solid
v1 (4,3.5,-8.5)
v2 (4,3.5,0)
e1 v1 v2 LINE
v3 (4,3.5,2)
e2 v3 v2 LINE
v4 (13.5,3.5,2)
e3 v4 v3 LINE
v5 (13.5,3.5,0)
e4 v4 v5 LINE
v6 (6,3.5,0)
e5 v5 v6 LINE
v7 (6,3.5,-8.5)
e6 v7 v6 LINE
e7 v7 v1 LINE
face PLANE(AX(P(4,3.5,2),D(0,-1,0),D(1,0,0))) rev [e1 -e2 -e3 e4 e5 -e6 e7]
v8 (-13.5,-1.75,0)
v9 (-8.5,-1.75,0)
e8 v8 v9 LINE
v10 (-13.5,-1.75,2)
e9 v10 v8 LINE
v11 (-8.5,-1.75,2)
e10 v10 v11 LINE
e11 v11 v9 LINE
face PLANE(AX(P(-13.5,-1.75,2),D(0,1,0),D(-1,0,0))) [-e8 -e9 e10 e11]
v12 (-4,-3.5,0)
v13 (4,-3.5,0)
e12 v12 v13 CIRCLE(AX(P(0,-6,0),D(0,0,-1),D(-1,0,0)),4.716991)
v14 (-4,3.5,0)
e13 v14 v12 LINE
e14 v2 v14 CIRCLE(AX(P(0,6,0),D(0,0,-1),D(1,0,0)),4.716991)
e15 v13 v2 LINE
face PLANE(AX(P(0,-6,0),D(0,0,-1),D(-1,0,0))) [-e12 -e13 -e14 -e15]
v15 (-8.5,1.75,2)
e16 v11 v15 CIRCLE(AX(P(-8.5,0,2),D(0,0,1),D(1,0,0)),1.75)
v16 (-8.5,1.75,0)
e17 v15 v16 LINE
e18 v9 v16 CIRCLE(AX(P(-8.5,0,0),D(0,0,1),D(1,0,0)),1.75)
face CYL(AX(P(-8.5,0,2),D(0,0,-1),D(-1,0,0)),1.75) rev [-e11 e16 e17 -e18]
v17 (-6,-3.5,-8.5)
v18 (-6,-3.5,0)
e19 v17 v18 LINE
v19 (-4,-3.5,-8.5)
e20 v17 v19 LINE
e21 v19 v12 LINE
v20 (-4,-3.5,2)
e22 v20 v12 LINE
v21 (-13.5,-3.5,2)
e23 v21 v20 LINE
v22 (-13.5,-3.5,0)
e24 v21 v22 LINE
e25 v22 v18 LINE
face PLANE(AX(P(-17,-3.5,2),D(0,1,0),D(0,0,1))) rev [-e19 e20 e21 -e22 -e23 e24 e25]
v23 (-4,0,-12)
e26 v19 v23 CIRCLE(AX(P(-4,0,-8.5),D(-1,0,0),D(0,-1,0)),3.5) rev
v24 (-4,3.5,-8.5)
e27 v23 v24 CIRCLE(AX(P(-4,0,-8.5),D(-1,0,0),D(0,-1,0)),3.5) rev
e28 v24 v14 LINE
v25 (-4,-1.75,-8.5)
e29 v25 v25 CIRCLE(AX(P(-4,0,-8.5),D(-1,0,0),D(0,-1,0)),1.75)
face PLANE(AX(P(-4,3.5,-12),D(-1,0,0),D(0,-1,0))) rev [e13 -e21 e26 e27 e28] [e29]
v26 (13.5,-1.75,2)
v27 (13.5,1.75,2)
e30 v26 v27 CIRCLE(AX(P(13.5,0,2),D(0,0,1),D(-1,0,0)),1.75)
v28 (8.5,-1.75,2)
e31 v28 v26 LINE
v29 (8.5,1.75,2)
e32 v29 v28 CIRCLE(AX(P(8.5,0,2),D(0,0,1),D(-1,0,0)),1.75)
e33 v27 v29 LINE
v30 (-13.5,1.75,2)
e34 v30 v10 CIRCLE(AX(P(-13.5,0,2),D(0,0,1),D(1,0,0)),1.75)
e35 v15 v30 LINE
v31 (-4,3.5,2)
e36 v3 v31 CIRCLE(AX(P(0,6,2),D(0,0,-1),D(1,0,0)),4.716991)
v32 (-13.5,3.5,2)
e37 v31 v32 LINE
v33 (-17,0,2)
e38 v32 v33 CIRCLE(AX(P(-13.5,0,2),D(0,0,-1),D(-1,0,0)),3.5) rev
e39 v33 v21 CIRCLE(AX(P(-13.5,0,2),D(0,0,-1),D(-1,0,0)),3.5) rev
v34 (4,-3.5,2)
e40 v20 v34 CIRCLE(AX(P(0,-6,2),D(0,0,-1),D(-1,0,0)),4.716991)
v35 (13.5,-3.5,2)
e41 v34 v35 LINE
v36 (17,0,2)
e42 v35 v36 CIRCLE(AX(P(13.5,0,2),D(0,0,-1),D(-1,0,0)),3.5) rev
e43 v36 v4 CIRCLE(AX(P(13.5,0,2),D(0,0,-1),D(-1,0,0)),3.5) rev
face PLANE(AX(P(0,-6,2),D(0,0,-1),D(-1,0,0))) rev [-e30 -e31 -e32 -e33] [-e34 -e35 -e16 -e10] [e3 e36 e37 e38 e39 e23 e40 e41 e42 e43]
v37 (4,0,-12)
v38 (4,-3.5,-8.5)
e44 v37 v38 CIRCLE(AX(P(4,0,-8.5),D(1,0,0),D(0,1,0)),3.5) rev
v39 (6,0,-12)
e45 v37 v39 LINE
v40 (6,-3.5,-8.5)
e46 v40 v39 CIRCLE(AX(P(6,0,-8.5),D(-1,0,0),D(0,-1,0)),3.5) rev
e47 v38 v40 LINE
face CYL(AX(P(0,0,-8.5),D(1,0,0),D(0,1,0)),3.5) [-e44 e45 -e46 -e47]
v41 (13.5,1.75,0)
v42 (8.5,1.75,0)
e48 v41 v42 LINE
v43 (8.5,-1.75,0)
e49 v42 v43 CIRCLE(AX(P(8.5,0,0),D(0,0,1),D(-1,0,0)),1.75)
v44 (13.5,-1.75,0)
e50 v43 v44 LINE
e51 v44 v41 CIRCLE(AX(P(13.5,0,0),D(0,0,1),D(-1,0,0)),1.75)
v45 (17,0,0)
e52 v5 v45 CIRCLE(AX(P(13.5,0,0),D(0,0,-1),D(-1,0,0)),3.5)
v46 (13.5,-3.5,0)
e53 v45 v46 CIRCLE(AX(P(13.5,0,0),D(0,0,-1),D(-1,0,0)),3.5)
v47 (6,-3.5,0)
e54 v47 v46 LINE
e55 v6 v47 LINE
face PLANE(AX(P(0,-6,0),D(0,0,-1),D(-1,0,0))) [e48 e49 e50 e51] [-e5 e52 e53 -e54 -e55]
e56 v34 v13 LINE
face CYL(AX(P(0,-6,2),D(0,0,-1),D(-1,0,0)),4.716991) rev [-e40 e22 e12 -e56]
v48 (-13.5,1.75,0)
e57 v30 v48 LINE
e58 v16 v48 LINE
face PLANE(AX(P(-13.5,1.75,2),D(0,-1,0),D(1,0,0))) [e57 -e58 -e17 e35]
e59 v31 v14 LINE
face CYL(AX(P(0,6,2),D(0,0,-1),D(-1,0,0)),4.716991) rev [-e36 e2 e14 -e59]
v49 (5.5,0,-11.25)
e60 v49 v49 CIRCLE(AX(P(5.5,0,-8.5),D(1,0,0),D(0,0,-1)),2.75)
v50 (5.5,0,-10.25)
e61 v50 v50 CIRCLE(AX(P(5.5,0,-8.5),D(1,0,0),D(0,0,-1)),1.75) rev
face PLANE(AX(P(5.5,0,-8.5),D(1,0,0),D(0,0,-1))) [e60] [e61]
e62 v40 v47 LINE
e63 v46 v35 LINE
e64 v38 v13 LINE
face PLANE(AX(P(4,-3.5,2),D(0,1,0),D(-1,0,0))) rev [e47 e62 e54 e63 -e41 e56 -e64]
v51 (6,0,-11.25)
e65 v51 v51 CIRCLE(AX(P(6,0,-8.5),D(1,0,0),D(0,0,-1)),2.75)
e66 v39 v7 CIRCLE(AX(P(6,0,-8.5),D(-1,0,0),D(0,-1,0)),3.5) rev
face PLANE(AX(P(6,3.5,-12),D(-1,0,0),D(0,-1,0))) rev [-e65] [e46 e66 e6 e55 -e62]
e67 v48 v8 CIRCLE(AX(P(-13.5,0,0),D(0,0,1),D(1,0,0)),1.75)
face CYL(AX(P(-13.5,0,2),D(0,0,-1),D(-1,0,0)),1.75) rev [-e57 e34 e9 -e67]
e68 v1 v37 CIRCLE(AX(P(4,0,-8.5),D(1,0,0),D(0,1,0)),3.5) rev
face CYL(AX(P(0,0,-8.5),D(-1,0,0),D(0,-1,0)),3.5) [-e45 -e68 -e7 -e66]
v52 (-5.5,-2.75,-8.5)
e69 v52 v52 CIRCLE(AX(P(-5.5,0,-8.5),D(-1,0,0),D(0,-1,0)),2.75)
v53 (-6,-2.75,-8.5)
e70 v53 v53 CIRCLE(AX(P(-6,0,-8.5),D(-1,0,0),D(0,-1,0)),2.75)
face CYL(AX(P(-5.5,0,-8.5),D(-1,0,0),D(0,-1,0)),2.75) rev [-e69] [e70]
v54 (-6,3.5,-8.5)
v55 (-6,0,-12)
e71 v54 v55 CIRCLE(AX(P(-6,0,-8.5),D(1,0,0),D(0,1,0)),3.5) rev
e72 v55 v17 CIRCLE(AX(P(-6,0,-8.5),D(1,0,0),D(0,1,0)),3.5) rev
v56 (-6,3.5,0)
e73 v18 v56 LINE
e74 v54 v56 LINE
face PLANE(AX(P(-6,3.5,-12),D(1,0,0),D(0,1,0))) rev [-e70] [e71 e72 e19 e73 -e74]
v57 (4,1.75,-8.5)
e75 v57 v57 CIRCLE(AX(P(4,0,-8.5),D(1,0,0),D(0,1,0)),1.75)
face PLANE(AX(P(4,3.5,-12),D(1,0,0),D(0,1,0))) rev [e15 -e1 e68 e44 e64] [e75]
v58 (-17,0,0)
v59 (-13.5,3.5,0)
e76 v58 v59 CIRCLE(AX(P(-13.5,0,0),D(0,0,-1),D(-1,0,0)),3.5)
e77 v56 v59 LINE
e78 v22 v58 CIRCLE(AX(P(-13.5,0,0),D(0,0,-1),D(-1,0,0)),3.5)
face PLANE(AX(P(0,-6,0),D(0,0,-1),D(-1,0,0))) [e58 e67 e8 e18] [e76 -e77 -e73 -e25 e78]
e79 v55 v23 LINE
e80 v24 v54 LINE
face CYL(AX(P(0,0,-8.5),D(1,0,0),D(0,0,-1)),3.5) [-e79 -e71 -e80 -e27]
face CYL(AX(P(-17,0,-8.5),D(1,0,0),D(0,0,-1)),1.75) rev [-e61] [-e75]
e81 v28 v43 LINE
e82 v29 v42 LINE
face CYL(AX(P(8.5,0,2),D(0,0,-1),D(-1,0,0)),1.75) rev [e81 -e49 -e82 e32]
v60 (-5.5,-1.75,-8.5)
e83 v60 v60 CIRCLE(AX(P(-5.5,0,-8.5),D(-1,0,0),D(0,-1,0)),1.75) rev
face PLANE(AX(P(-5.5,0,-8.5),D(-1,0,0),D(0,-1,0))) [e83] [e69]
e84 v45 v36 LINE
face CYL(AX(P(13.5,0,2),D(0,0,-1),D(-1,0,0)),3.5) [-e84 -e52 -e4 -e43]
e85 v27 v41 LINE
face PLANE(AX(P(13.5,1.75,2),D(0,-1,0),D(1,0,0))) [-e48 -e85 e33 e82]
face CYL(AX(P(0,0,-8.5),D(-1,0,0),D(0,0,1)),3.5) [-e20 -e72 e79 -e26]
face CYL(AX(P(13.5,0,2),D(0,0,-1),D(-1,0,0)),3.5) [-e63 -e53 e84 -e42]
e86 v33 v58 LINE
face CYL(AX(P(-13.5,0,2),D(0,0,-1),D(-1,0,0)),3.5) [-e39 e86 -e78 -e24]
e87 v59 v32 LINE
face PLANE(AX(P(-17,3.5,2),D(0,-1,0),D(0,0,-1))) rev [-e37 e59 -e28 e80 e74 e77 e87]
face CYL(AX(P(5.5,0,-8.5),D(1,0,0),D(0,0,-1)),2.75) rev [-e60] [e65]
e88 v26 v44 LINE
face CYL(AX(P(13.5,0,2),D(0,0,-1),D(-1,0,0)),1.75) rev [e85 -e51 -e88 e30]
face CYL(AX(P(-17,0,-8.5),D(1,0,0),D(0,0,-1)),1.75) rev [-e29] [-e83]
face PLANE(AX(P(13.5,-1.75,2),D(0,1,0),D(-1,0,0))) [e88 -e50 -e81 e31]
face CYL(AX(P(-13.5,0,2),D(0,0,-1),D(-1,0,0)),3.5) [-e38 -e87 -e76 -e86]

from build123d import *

# Parameters (mm, degrees)
EXTRUDE_2_DEPTH     = 2
SKETCH_4_W          = 2
SKETCH_4_H          = 7
EXTRUDE_3_DEPTH     = 12
FILLET_1_R          = 3.5
SKETCH_5_R          = 1.75
CUT_EXTRUDE_1_DEPTH = 27.177280225
FILLET_2_R          = 3.5
SKETCH_6_R          = 2.75
CUT_EXTRUDE_2_DEPTH = 0.5
CUT_EXTRUDE_START   = -0.5
SKETCH_7_R          = 2.75
CUT_EXTRUDE_3_DEPTH = 0.5


with BuildPart() as part:
    # 草图3 → 凸台-拉伸2 (new body)
    with BuildSketch(Plane.XY):
        with BuildLine():
            Line((-17, -3.5), (-4, -3.5))
            ThreePointArc((-4, -3.5), (0, -1.283009434), (4, -3.5))
            Line((4, -3.5), (17, -3.5))
            Line((17, -3.5), (17, 3.5))
            Line((17, 3.5), (4, 3.5))
            ThreePointArc((4, 3.5), (0, 1.283009434), (-4, 3.5))
            Line((-4, 3.5), (-17, 3.5))
            Line((-17, 3.5), (-17, -3.5))
        make_face()
        with BuildLine():
            Line((-13.5, 1.75), (-8.5, 1.75))
            ThreePointArc((-8.5, 1.75), (-6.75, 0), (-8.5, -1.75))
            Line((-8.5, -1.75), (-13.5, -1.75))
            ThreePointArc((-13.5, -1.75), (-15.25, 0), (-13.5, 1.75))
        make_face(mode=Mode.SUBTRACT)
        with BuildLine():
            Line((13.5, 1.75), (8.5, 1.75))
            ThreePointArc((8.5, 1.75), (6.75, 0), (8.5, -1.75))
            Line((8.5, -1.75), (13.5, -1.75))
            ThreePointArc((13.5, -1.75), (15.25, 0), (13.5, 1.75))
        make_face(mode=Mode.SUBTRACT)
    extrude(amount=EXTRUDE_2_DEPTH)

    # 草图4 → 凸台-拉伸3 (add)
    with BuildSketch(Plane(origin=(0, 0, 0), x_dir=(-1, 0, 0), z_dir=(0, 0, -1))):
        with Locations((-5, 0)):
            Rectangle(SKETCH_4_W, SKETCH_4_H)
        with Locations((5, 0)):
            Rectangle(SKETCH_4_W, SKETCH_4_H)
    extrude(amount=EXTRUDE_3_DEPTH)

    # 圆角1
    fillet_1_edges = [part.edges().sort_by_distance(p)[0] for p in [
        (-5, -3.5, -12),
        (-5, 3.5, -12),
        (5, -3.5, -12),
        (5, 3.5, -12),
    ]]
    fillet(fillet_1_edges, radius=FILLET_1_R - 0.0001)  # a hair under: the kernel refuses the full size

    # 草图5 → 切除-拉伸1 (cut, through all)
    with BuildSketch(Plane(origin=(6, 0, 0), x_dir=(0, 0, -1), z_dir=(1, 0, 0))):
        with Locations(Location((8.5, 0, 0), (0, 0, 270))):
            Circle(SKETCH_5_R)
    extrude(amount=-CUT_EXTRUDE_1_DEPTH, mode=Mode.SUBTRACT)

    # 圆角2
    fillet_2_edges = [part.edges().sort_by_distance(p)[0] for p in [
        (17, -3.5, 1),
        (17, 3.5, 1),
        (-17, -3.5, 1),
        (-17, 3.5, 1),
    ]]
    fillet(fillet_2_edges, radius=FILLET_2_R - 0.0001)  # a hair under: the kernel refuses the full size

    # 草图6 → 切除-拉伸2 (cut)
    with BuildSketch(Plane(origin=(6, 0, 0), x_dir=(0, 0, -1), z_dir=(1, 0, 0))):
        with Locations((8.5, 0)):
            Circle(SKETCH_6_R)
    extrude(amount=-CUT_EXTRUDE_2_DEPTH, mode=Mode.SUBTRACT)

    # 草图7 → 切除-拉伸3 (cut)
    with BuildSketch(Plane.ZY.offset(6).offset(CUT_EXTRUDE_START)):
        with Locations(Location((-8.5, 0, 0), (0, 0, 180))):
            Circle(SKETCH_7_R)
    extrude(amount=CUT_EXTRUDE_3_DEPTH, mode=Mode.SUBTRACT)


solid = part.part
